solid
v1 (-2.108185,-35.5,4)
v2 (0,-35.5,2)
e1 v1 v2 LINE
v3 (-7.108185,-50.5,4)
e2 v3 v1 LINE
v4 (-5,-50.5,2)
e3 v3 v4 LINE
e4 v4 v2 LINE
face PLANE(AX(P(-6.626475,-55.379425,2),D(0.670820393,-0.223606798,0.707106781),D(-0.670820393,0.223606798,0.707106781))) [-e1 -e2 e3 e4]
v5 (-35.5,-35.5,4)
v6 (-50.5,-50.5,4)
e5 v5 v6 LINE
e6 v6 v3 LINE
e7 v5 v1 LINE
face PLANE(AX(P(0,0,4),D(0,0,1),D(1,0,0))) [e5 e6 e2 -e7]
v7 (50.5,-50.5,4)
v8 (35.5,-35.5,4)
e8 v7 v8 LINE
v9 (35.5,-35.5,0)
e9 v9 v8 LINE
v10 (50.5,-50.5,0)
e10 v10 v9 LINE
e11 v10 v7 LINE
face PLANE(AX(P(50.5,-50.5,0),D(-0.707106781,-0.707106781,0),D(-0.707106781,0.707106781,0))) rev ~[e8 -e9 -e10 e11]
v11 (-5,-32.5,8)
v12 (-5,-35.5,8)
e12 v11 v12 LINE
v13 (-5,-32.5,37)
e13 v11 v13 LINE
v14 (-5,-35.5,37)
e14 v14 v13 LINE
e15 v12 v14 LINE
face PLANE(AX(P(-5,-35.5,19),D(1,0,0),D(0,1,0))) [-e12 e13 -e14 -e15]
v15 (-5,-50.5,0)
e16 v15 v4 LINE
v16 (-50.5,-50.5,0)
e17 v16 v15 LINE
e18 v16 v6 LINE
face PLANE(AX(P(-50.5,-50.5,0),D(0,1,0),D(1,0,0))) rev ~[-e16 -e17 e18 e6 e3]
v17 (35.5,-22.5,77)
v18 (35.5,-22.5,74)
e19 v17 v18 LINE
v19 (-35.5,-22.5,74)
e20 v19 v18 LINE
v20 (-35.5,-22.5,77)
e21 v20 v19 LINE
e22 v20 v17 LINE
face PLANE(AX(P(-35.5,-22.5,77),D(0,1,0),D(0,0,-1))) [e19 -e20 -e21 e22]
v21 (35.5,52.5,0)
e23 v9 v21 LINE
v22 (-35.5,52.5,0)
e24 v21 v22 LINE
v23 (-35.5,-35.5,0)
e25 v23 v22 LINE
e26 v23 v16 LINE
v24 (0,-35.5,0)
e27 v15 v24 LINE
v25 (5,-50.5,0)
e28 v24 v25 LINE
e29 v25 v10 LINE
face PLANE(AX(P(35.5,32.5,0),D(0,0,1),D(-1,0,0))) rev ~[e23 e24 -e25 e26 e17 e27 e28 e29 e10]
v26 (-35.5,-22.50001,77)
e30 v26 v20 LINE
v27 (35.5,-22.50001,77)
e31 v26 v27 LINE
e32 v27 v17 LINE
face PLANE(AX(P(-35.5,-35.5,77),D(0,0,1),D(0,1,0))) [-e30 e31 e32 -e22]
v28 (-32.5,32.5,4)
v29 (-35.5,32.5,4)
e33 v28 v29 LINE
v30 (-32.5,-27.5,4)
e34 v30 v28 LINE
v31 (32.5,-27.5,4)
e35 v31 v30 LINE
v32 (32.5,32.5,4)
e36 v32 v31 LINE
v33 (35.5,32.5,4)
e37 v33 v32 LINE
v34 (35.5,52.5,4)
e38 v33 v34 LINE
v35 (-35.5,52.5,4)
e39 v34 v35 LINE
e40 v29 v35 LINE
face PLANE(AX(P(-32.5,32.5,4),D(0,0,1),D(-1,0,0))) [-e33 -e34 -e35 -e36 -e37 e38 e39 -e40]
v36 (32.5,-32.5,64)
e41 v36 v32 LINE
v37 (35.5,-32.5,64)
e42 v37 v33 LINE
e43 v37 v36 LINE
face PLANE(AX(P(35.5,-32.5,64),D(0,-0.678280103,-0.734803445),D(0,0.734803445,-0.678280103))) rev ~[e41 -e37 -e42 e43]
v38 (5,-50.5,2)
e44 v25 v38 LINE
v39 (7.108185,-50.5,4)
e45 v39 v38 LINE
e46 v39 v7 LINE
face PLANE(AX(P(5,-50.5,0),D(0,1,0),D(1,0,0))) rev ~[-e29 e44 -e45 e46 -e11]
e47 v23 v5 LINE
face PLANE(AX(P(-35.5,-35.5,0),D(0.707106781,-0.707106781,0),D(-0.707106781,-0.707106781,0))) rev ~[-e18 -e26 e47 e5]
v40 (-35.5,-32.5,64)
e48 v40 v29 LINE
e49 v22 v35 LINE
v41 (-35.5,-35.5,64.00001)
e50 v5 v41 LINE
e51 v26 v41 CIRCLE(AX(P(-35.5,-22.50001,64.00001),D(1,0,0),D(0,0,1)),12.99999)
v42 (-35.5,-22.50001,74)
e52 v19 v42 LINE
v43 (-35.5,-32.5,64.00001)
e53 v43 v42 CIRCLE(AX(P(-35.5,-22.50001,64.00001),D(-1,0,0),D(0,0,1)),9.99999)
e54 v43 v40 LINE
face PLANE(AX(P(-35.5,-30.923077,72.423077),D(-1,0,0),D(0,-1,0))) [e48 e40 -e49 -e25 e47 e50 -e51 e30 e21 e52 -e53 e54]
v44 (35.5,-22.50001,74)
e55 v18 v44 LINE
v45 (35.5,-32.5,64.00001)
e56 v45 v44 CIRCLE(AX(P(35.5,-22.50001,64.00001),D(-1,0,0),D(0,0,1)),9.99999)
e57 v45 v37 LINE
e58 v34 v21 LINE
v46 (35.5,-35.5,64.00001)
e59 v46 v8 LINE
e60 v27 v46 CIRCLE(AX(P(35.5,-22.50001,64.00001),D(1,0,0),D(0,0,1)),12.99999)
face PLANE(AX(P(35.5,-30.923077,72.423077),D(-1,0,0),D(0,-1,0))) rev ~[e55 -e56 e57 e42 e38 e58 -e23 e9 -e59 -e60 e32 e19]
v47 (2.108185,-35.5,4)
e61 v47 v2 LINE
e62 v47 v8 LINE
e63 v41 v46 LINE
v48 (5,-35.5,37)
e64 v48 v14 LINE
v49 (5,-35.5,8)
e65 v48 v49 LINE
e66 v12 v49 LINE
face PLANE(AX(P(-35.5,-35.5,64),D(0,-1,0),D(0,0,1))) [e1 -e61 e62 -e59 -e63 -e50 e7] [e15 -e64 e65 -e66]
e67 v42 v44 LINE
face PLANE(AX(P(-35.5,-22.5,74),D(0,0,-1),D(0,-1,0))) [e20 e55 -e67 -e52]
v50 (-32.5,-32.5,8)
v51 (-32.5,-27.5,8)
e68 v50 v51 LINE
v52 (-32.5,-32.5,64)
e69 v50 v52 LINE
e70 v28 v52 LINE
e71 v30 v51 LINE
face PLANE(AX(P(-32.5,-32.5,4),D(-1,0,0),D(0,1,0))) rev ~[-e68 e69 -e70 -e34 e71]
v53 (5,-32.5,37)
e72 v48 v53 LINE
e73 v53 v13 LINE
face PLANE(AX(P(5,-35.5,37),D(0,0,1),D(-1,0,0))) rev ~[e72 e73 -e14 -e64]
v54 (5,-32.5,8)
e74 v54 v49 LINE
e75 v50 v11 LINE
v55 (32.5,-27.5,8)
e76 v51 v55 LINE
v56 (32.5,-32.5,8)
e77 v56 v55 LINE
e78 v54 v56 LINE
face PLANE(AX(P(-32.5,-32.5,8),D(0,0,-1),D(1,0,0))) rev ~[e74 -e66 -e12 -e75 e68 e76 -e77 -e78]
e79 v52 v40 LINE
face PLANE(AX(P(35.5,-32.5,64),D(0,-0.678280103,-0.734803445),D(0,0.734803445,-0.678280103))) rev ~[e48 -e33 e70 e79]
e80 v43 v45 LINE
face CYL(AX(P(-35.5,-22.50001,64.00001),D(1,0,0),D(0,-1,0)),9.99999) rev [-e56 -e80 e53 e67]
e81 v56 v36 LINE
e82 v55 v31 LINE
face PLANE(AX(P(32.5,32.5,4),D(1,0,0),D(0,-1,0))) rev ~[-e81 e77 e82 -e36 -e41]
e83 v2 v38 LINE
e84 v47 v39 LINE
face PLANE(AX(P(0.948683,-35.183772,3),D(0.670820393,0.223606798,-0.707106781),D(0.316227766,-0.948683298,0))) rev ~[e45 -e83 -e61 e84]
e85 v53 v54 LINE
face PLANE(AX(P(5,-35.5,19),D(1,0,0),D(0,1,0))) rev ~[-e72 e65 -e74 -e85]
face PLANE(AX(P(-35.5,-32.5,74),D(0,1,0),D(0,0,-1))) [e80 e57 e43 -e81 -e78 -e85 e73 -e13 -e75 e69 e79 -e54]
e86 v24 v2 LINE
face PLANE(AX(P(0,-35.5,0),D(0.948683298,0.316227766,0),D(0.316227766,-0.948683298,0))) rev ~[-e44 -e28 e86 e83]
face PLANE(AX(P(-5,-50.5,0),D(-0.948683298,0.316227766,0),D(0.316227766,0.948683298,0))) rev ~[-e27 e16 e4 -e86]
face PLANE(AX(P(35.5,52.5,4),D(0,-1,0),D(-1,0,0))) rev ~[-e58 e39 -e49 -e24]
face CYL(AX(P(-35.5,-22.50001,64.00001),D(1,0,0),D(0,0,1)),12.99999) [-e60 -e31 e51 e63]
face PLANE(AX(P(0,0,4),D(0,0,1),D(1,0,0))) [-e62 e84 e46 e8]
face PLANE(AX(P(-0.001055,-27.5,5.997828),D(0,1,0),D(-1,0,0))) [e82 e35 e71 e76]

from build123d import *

# Parameters (mm, degrees)
F0_W         = 65
F0_H         = 65
F1_DEPTH     = 4
F3_DEPTH     = 60
F5_DEPTH     = 105.7
F7_DEPTH     = 25
F8_T4_DEPTH  = 26.0981202527
F8_T10_DEPTH = 26.0981202527
F9_SIZE      = 2
F10_DEPTH    = 20
F11_DEPTH    = 3
F12_DEPTH    = 3
F14_DEPTH    = 5
F15_DEPTH    = 15
F16_DEPTH    = 15
F18_DEPTH    = 71
F19_R        = 9.99999
F20_R        = 12.99999


# Not quite as in the source:
# - a fillet or chamfer that OpenCascade refuses, or shapes differently, is made with other operations: its cross-section is extruded or revolved along the edge and cut away or added
# - a fillet or chamfer is up to 0.001 mm smaller than in the source, because OpenCascade refuses the exact size


with BuildPart() as f1:
    # F0 (on Top) → F1 (new body)
    with BuildSketch(Plane.XY):
        Rectangle(F0_W, F0_H)
        Polygon((32.5, -32.5), (-32.5, -32.5), (-32.5, 32.5), (-35.5, 32.5), (-35.5, -35.5), (0, -35.5), (35.5, -35.5), (35.5, 32.5), (32.5, 32.5), align=None)
        Polygon((0, -35.5), (-35.5, -35.5), (-35.5, -50.5), (-5, -50.5), align=None)
        Polygon((-35.5, -50.5), (-35.5, -35.5), (-50.5, -50.5), align=None)
        Polygon((35.5, -50.5), (35.5, -35.5), (0, -35.5), (5, -50.5), (5.9827403165, -50.5), align=None)
        Polygon((50.5, -50.5), (35.5, -35.5), (35.5, -50.5), align=None)
    extrude(amount=F1_DEPTH)

    # F2 (on face) → F3 (join)
    with BuildSketch(Plane.XY.offset(4)):
        Polygon((32.5, -32.5), (-32.5, -32.5), (-32.5, 32.5), (-35.5, 32.5), (-35.5, -35.5), (0, -35.5), (35.5, -35.5), (35.5, 32.5), (32.5, 32.5), align=None)
    extrude(amount=F3_DEPTH)

    # F4 (on face) → F5 (cut)
    with BuildSketch(Plane.YZ.offset(35.5)):
        Polygon((-32.5, 64), (32.5, 4), (32.5, 64), align=None)
    extrude(amount=-F5_DEPTH, mode=Mode.SUBTRACT)

    # F6 (on face) → F7 (cut)
    with BuildSketch(Plane.XZ.offset(35.5)):
        Polygon((-5, 8), (0, 8), (3.482630942, 8), (25, 8), (25, 19), (5, 19), (5, 37), (0, 37), (-5, 37), (-5, 19), (-25, 19), (-25, 8), align=None)
    extrude(amount=-F7_DEPTH, mode=Mode.SUBTRACT)

    # F8: chamfer of 2 on 1 edges, made by hand


with BuildPart() as f8_tool2:
    # F8_s3 → F8_t4 (new body)
    with BuildSketch(Plane(origin=(-17.2764751324, -51.8294253971, 0), x_dir=(0, 0, 1), z_dir=(0.316227766, 0.9486832981, 0))):
        Polygon((2, 11.2260856936), (4, 9.2260856936), (4, 11.2260856936), align=None)
    extrude(amount=F8_T4_DEPTH)

    split(bisect_by=Plane.XZ.offset(35.5), keep=Keep.TOP)

    split(bisect_by=Plane(origin=(-10.65, -3.55, 0), x_dir=(0, 0, 1), z_dir=(-0.9486832981, -0.316227766, 0)), keep=Keep.TOP)


with BuildPart() as f1_1:
    add(f1.part)

    # F8_t1: cut F8_tool2
    add(f8_tool2.part, mode=Mode.SUBTRACT)


with BuildPart() as f8_tool8:
    # F8_s9 → F8_t10 (new body)
    with BuildSketch(Plane(origin=(-17.2764751324, -51.8294253971, 0), x_dir=(0, 0, 1), z_dir=(0.316227766, 0.9486832981, 0))):
        Polygon((2, 11.2260856936), (4, 9.2260856936), (4, 11.2260856936), align=None)
    extrude(amount=F8_T10_DEPTH)

    split(bisect_by=Plane.XZ.offset(32.5), keep=Keep.BOTTOM)

    split(bisect_by=Plane(origin=(-10.65, -3.55, 0), x_dir=(0, 0, 1), z_dir=(-0.9486832981, -0.316227766, 0)), keep=Keep.TOP)


with BuildPart() as f1_2:
    add(f1_1.part)

    # F8_t7: cut F8_tool8
    add(f8_tool8.part, mode=Mode.SUBTRACT)

    # F9
    f9_edges = [f1_2.edges().sort_by_distance(p)[0] for p in [
        (2.5, -43, 4),
    ]]
    chamfer(f9_edges, length=F9_SIZE)

    # F10 (add): a face of the model
    f10_faces = [f1_2.faces().sort_by_distance(p)[0] for p in [
        (0, 32.5, 2),
    ]]
    extrude(f10_faces, amount=F10_DEPTH)

    # F11 (add): a face of the model
    f11_faces = [f1_2.faces().sort_by_distance(p)[0] for p in [
        (15, -34, 19),
    ]]
    extrude(f11_faces, amount=-F11_DEPTH)

    # F12 (add): a face of the model
    f12_faces = [f1_2.faces().sort_by_distance(p)[0] for p in [
        (-15, -34, 19),
    ]]
    extrude(f12_faces, amount=-F12_DEPTH)

    # F13 (on face) → F14 (join)
    with BuildSketch(Plane(origin=(0, -32.5, 0), x_dir=(-1, 0, 0), z_dir=(0, 1, 0))):
        Polygon((32.5, 8), (25, 8), (-25, 8), (-32.5, 8), (-32.5, 4), (1, 4), (1, 3.8973665961), (1.1081851068, 4), (32.5, 4), align=None)
    extrude(amount=F14_DEPTH)

    # F15 (add): a face of the model
    f15_faces = [f1_2.faces().sort_by_distance(p)[0] for p in [
        (15, -34, 19),
    ]]
    extrude(f15_faces, amount=F15_DEPTH)

    # F16 (add): a face of the model
    f16_faces = [f1_2.faces().sort_by_distance(p)[0] for p in [
        (-15, -34, 19),
    ]]
    extrude(f16_faces, amount=F16_DEPTH)

    # F17 (on face) → F18 (join)
    with BuildSketch(Plane(origin=(-35.5, 0, 0), x_dir=(0, -1, 0), z_dir=(-1, 0, 0))):
        Polygon((32.5, 74), (32.5, 64), (35.5, 64), (35.5, 77), (22.5, 77), (22.5, 74), align=None)
    extrude(amount=-F18_DEPTH)

    # F19 (radius 10 in the source; OpenCascade refuses exactly that, so slightly less here)
    f19_edges = [f1_2.edges().sort_by_distance(p)[0] for p in [
        (0, -32.5, 74),
    ]]
    fillet(f19_edges, radius=F19_R)

    # F20 (radius 13 in the source; OpenCascade refuses exactly that, so slightly less here)
    f20_edges = [f1_2.edges().sort_by_distance(p)[0] for p in [
        (0, -35.5, 77),
    ]]
    fillet(f20_edges, radius=F20_R)


solid = f1_2.part
